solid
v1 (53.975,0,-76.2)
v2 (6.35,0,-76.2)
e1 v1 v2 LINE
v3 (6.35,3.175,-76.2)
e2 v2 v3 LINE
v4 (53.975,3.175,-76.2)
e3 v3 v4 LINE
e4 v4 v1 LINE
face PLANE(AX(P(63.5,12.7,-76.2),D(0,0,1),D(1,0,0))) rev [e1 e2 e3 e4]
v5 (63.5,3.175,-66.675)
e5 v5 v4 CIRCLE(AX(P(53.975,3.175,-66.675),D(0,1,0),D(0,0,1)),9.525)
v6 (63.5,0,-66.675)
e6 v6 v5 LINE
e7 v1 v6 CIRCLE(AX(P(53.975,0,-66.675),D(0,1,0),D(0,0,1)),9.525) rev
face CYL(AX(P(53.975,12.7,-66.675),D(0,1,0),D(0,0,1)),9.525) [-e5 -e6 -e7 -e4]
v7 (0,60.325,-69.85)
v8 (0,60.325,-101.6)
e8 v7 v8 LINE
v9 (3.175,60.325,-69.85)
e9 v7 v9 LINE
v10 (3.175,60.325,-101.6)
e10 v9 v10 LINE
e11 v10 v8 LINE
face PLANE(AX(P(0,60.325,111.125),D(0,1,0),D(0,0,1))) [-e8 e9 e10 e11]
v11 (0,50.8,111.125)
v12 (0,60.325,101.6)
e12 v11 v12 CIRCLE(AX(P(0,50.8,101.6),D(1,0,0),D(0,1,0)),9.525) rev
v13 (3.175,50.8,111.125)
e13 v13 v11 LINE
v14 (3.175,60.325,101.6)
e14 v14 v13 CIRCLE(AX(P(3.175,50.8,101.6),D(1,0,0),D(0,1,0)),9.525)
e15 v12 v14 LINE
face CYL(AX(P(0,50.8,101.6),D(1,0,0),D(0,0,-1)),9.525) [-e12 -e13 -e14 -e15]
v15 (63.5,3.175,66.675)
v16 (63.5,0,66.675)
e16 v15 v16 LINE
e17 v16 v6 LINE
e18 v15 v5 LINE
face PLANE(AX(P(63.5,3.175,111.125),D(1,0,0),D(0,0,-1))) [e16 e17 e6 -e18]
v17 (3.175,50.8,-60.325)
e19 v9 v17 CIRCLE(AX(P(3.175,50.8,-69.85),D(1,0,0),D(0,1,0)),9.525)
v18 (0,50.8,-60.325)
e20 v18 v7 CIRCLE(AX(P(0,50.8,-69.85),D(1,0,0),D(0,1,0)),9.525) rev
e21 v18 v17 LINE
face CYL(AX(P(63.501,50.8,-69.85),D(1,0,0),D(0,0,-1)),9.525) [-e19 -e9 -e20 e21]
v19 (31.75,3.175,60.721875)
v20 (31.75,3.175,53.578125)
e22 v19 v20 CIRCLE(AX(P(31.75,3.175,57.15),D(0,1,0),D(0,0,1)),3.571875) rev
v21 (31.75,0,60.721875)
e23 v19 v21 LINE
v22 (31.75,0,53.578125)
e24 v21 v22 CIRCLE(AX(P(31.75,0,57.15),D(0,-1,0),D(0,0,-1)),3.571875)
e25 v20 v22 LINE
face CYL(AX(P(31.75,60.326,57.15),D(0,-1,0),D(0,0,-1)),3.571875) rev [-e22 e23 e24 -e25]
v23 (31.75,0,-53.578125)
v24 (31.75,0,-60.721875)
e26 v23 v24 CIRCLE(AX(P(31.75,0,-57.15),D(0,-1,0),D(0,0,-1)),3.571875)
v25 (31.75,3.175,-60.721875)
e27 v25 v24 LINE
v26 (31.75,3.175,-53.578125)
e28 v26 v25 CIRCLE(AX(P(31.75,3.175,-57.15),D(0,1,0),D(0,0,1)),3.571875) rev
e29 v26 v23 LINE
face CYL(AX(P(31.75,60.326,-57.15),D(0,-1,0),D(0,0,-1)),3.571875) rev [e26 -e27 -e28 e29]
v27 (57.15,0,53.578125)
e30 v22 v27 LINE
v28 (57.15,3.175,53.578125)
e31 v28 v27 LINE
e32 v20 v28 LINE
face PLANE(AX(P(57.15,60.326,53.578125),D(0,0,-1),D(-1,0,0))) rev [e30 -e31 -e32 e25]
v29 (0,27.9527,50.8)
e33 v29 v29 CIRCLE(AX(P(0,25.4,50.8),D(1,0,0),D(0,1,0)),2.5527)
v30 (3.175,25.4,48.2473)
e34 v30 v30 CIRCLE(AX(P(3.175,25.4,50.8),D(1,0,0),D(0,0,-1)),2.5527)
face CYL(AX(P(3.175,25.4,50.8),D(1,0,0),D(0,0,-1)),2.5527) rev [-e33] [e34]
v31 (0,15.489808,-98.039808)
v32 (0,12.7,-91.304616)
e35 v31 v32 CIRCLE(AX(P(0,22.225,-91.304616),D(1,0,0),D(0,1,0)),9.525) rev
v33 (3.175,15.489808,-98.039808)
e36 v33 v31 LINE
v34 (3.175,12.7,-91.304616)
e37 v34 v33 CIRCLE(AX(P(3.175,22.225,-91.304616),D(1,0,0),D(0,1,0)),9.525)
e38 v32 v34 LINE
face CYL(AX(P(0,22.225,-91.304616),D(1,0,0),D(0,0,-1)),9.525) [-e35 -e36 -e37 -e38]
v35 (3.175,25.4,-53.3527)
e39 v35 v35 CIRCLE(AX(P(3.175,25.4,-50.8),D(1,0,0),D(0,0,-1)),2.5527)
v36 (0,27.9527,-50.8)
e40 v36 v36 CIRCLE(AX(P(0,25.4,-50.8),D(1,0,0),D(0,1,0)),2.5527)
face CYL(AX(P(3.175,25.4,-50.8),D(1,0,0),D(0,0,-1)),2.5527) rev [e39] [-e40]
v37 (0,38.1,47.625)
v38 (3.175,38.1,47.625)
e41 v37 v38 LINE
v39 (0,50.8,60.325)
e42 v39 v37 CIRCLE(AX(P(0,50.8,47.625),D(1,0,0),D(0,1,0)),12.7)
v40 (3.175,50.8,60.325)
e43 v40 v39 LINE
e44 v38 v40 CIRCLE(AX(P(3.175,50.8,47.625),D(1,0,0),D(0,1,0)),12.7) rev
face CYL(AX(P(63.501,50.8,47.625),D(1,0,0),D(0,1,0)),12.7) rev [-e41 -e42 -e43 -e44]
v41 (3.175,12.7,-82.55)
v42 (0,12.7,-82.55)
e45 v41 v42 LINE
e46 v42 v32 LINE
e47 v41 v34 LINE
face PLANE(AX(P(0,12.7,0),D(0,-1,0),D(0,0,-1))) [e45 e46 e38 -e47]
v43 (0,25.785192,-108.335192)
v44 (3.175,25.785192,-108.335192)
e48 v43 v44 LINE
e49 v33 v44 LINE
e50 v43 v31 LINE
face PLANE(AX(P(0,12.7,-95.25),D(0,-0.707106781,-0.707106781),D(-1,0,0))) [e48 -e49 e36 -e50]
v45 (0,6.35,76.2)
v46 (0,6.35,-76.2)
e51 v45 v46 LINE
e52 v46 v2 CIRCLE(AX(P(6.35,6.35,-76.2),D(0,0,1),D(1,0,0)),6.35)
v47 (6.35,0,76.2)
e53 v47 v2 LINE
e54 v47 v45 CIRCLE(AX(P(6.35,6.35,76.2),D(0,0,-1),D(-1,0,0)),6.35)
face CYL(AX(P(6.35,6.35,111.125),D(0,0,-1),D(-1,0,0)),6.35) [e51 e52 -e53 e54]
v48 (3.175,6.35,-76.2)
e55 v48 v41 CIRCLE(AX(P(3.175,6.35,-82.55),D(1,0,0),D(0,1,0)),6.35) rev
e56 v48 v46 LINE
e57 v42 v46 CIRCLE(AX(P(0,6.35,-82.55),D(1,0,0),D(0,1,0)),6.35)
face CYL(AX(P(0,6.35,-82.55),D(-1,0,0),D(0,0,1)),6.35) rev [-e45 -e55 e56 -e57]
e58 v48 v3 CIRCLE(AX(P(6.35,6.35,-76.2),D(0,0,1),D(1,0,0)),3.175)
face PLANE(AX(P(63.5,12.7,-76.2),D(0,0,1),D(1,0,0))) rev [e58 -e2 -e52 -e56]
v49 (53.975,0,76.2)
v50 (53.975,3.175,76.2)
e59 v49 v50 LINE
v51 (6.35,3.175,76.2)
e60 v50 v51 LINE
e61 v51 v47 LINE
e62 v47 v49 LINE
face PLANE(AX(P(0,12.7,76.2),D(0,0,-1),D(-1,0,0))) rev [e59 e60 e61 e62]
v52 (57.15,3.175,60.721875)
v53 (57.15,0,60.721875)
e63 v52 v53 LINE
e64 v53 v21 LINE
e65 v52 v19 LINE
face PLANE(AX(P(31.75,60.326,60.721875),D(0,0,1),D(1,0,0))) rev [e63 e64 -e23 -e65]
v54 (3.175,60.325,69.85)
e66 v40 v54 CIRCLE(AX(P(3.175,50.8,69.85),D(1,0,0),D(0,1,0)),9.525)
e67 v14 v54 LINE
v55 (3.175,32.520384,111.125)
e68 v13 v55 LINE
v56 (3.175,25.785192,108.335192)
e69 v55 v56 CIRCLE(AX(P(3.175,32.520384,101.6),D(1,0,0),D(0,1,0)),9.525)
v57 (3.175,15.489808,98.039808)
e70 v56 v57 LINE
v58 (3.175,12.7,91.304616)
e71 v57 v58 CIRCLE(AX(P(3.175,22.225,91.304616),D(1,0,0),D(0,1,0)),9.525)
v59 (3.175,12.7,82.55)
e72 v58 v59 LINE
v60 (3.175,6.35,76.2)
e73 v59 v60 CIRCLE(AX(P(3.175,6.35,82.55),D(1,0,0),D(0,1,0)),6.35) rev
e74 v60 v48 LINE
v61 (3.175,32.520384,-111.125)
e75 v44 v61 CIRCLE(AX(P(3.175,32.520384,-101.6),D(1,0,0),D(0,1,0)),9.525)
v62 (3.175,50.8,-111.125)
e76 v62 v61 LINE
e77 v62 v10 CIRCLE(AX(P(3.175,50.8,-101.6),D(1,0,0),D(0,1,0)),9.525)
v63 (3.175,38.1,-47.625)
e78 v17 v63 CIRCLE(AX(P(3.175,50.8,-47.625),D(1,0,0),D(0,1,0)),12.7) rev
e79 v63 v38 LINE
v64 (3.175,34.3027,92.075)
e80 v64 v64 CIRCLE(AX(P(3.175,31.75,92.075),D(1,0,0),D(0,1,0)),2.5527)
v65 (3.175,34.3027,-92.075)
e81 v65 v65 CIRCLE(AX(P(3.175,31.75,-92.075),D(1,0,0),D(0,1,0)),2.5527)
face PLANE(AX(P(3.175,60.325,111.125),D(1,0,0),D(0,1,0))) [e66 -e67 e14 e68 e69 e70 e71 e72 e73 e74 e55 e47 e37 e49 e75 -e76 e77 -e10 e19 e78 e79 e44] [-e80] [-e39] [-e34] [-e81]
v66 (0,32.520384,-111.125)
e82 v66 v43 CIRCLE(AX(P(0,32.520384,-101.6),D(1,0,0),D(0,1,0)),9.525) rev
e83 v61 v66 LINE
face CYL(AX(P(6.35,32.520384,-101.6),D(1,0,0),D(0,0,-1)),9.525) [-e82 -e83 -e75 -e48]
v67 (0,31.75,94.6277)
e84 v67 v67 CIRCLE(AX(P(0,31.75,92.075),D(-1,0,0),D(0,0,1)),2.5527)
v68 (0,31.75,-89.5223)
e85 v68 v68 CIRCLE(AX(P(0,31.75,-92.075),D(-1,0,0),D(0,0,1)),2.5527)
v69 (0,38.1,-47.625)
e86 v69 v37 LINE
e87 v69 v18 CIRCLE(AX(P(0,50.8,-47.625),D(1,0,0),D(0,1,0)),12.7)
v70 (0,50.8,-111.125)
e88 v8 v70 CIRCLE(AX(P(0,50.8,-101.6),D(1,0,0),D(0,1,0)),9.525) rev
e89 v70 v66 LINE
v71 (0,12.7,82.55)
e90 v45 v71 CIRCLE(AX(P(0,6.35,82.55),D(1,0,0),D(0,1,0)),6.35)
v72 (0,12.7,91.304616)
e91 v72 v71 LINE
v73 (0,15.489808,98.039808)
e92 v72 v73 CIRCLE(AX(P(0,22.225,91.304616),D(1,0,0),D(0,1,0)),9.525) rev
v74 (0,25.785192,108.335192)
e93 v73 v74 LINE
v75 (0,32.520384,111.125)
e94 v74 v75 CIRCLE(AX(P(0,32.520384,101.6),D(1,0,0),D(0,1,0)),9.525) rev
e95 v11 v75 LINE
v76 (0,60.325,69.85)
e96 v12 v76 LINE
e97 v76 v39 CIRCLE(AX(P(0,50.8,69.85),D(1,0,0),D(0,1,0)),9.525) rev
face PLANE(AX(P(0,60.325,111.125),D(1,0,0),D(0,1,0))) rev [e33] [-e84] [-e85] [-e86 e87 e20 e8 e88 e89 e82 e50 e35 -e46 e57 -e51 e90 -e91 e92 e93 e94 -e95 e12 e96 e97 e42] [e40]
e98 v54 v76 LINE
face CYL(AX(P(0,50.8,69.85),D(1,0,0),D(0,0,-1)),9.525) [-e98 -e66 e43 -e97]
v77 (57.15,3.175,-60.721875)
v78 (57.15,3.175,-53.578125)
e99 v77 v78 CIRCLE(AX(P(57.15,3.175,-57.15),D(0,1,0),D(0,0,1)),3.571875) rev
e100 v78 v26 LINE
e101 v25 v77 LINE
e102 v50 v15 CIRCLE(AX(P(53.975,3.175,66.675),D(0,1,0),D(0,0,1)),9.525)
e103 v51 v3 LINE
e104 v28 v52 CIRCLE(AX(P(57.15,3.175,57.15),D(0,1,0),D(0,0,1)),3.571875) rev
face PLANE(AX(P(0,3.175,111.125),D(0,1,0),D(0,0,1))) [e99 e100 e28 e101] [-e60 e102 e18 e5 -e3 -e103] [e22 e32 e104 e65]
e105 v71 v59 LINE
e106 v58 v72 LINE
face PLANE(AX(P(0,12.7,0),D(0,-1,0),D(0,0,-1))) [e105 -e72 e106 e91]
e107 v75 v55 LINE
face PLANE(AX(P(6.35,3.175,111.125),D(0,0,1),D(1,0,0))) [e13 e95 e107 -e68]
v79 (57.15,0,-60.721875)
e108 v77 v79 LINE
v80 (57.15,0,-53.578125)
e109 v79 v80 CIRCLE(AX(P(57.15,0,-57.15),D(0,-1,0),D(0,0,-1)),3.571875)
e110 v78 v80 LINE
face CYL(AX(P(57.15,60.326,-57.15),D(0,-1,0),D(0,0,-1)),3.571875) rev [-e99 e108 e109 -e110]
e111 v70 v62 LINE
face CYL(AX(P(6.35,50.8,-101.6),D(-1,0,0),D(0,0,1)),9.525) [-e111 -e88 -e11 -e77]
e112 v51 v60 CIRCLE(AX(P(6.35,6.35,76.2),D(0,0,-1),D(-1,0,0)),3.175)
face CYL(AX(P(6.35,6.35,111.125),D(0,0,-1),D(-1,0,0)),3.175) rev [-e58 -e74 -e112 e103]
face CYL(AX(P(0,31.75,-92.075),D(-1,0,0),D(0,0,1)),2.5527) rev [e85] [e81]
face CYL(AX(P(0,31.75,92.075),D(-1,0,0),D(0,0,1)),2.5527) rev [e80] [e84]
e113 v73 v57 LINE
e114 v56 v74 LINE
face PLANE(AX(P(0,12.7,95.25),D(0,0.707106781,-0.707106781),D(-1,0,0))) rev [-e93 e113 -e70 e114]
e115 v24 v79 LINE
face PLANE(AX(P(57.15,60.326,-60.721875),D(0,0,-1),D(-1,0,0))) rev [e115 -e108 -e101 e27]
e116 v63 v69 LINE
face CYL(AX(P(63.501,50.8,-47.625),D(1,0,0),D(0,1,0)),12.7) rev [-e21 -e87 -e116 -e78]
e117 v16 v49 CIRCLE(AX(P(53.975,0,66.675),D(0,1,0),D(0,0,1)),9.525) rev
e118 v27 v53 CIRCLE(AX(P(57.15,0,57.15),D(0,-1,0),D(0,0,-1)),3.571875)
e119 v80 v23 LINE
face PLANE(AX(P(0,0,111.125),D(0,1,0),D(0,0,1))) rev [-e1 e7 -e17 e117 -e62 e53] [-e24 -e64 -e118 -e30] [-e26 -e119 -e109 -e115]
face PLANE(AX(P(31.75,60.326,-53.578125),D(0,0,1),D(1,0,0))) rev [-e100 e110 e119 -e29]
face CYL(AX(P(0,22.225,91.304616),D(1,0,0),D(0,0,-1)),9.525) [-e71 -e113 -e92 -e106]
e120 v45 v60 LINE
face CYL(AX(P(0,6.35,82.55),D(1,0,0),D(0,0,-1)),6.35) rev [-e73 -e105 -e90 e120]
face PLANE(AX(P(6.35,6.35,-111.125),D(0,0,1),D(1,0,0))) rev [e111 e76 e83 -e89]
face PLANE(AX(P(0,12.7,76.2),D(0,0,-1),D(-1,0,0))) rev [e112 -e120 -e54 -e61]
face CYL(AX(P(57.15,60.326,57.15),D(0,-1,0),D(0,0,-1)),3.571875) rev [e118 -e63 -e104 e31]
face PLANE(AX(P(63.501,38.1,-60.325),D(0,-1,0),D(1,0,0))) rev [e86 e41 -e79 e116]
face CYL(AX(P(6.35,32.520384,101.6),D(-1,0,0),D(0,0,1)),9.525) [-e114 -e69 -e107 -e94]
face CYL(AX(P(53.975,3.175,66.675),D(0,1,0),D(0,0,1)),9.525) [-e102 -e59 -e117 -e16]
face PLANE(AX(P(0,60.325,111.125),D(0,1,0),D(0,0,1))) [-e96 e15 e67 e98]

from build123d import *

# Parameters (mm, degrees)
BASE_FLANGE1_DEPTH          = 111.125
CUT_EXTRUDE1_REACH          = 143.492
F_1_4_20_TAPPED_HOLE1_D     = 5.1054
EXTRUDE1_REACH              = 143.492
SKETCH5_W                   = 120.65
SKETCH5_H                   = 22.225
FILLET2_R                   = 12.7
F_1_4_20_TAPPED_HOLE2_D     = 5.1054
F_1_4_20_TAPPED_HOLE2_DEPTH = 16.51
F_1_4_20_TAPPED_HOLE2_TIP   = 1.533816902
SKETCH8_W                   = 63.5
SKETCH8_H                   = 34.925
CUT_EXTRUDE2_DEPTH          = 12.7
CHAMFER1_SIZE               = 15.875
FILLET3_R                   = 9.525
FILLET4_R                   = 9.525
FILLET5_R                   = 6.35


# Sheet-metal steps are written as plain solids
with BuildPart() as part:
    # Sketch1 → Base-Flange1 (new, symmetric)
    with BuildSketch(Plane.XY):
        with BuildLine():
            Line((0, 60.325), (0, 6.35))
            ThreePointArc((0, 6.35), (1.859871939, 1.859871939), (6.35, 0))
            Line((6.35, 0), (63.5, 0))
            Line((63.5, 0), (63.5, 3.175))
            Line((63.5, 3.175), (6.35, 3.175))
            ThreePointArc((6.35, 3.175), (4.10493597, 4.10493597), (3.175, 6.35))
            Line((3.175, 6.35), (3.175, 60.325))
            Line((3.175, 60.325), (0, 60.325))
        make_face()
    extrude(amount=BASE_FLANGE1_DEPTH, both=True)

    # Sketch2 → Cut-Extrude1 (cut, up to next)
    with BuildSketch(Plane.XZ, mode=Mode.PRIVATE) as cut_extrude1_sk1:
        with BuildLine():
            Line((31.75, 60.721875), (57.15, 60.721875))
            ThreePointArc((57.15, 60.721875), (60.721875, 57.15), (57.15, 53.578125))
            Line((57.15, 53.578125), (31.75, 53.578125))
            ThreePointArc((31.75, 53.578125), (28.178125, 57.15), (31.75, 60.721875))
        make_face()
    cut_extrude1_tool1 = extrude(cut_extrude1_sk1.sketch, amount=-CUT_EXTRUDE1_REACH, mode=Mode.PRIVATE) & part.part
    # Sketch2 → Cut-Extrude1 (cut, up to next)
    with BuildSketch(Plane.XZ, mode=Mode.PRIVATE) as cut_extrude1_sk2:
        with BuildLine():
            Line((31.75, -53.578125), (57.15, -53.578125))
            ThreePointArc((57.15, -53.578125), (60.721875, -57.15), (57.15, -60.721875))
            Line((57.15, -60.721875), (31.75, -60.721875))
            ThreePointArc((31.75, -60.721875), (28.178125, -57.15), (31.75, -53.578125))
        make_face()
    cut_extrude1_tool2 = extrude(cut_extrude1_sk2.sketch, amount=-CUT_EXTRUDE1_REACH, mode=Mode.PRIVATE) & part.part
    add(cut_extrude1_tool1.solids().sort_by_distance((44.45, 0, 57.15))[0], mode=Mode.SUBTRACT)
    add(cut_extrude1_tool2.solids().sort_by_distance((44.45, 0, -57.15))[0], mode=Mode.SUBTRACT)

    # 1/4-20 Tapped Hole1 (through all)
    with Locations(Plane.ZY):
        with Locations((-92.075, 31.75), (92.075, 31.75)):
            Hole(F_1_4_20_TAPPED_HOLE1_D / 2)

    # Sketch5 → Extrude1 (cut, up to next)
    with BuildSketch(Plane.ZY, mode=Mode.PRIVATE) as extrude1_sk1:
        with Locations((0, 49.2125)):
            Rectangle(SKETCH5_W, SKETCH5_H)
    extrude1_tool1 = extrude(extrude1_sk1.sketch, amount=-EXTRUDE1_REACH, mode=Mode.PRIVATE) & part.part
    add(extrude1_tool1.solids().sort_by_distance((0, 49.2125, 0))[0], mode=Mode.SUBTRACT)

    # Fillet2
    fillet2_edges = [part.edges().sort_by_distance(p)[0] for p in [
        (1.5875, 38.1, -60.325),
        (1.5875, 38.1, 60.325),
    ]]
    fillet(fillet2_edges, radius=FILLET2_R)

    # 1/4-20 Tapped Hole2
    with Locations(Plane(origin=(3.175, 0, 0), x_dir=(0, 0, -1), z_dir=(1, 0, 0))):
        with Locations((-50.8, 25.4), (50.8, 25.4)):
            Hole(F_1_4_20_TAPPED_HOLE2_D / 2, depth=F_1_4_20_TAPPED_HOLE2_DEPTH)
            with Locations((0, 0, -(F_1_4_20_TAPPED_HOLE2_DEPTH + F_1_4_20_TAPPED_HOLE2_TIP / 2))):  # 118° drill point
                Cone(0, F_1_4_20_TAPPED_HOLE2_D / 2, F_1_4_20_TAPPED_HOLE2_TIP, mode=Mode.SUBTRACT)

    # Sketch8 → Cut-Extrude2 (cut)
    with BuildSketch(Plane.XZ):
        with Locations((31.75, 93.6625)):
            Rectangle(SKETCH8_W, SKETCH8_H)
        with Locations((31.75, -93.6625)):
            Rectangle(SKETCH8_W, SKETCH8_H)
    extrude(amount=-CUT_EXTRUDE2_DEPTH, mode=Mode.SUBTRACT)

    # Chamfer1
    chamfer1_edges = [part.edges().sort_by_distance(p)[0] for p in [
        (1.5875, 12.7, 111.125),
        (1.5875, 12.7, -111.125),
    ]]
    chamfer(chamfer1_edges, length=CHAMFER1_SIZE)

    # Fillet3
    fillet3_edges = [part.edges().sort_by_distance(p)[0] for p in [
        (1.5875, 60.325, -111.125),
        (1.5875, 60.325, -60.325),
        (1.5875, 60.325, 60.325),
        (1.5875, 60.325, 111.125),
        (63.5, 1.5875, -76.2),
        (63.5, 1.5875, 76.2),
    ]]
    fillet(fillet3_edges, radius=FILLET3_R - 0.0001)  # a hair under: the kernel refuses the full size

    # Fillet4
    fillet4_edges = [part.edges().sort_by_distance(p)[0] for p in [
        (1.5875, 12.7, 95.25),
        (1.5875, 28.575, 111.125),
        (1.5875, 12.7, -95.25),
        (1.5875, 28.575, -111.125),
    ]]
    fillet(fillet4_edges, radius=FILLET4_R)

    # Fillet5
    fillet5_edges = [part.edges().sort_by_distance(p)[0] for p in [
        (1.5875, 12.7, -76.2),
        (1.5875, 12.7, 76.2),
    ]]
    fillet(fillet5_edges, radius=FILLET5_R)


solid = part.part
